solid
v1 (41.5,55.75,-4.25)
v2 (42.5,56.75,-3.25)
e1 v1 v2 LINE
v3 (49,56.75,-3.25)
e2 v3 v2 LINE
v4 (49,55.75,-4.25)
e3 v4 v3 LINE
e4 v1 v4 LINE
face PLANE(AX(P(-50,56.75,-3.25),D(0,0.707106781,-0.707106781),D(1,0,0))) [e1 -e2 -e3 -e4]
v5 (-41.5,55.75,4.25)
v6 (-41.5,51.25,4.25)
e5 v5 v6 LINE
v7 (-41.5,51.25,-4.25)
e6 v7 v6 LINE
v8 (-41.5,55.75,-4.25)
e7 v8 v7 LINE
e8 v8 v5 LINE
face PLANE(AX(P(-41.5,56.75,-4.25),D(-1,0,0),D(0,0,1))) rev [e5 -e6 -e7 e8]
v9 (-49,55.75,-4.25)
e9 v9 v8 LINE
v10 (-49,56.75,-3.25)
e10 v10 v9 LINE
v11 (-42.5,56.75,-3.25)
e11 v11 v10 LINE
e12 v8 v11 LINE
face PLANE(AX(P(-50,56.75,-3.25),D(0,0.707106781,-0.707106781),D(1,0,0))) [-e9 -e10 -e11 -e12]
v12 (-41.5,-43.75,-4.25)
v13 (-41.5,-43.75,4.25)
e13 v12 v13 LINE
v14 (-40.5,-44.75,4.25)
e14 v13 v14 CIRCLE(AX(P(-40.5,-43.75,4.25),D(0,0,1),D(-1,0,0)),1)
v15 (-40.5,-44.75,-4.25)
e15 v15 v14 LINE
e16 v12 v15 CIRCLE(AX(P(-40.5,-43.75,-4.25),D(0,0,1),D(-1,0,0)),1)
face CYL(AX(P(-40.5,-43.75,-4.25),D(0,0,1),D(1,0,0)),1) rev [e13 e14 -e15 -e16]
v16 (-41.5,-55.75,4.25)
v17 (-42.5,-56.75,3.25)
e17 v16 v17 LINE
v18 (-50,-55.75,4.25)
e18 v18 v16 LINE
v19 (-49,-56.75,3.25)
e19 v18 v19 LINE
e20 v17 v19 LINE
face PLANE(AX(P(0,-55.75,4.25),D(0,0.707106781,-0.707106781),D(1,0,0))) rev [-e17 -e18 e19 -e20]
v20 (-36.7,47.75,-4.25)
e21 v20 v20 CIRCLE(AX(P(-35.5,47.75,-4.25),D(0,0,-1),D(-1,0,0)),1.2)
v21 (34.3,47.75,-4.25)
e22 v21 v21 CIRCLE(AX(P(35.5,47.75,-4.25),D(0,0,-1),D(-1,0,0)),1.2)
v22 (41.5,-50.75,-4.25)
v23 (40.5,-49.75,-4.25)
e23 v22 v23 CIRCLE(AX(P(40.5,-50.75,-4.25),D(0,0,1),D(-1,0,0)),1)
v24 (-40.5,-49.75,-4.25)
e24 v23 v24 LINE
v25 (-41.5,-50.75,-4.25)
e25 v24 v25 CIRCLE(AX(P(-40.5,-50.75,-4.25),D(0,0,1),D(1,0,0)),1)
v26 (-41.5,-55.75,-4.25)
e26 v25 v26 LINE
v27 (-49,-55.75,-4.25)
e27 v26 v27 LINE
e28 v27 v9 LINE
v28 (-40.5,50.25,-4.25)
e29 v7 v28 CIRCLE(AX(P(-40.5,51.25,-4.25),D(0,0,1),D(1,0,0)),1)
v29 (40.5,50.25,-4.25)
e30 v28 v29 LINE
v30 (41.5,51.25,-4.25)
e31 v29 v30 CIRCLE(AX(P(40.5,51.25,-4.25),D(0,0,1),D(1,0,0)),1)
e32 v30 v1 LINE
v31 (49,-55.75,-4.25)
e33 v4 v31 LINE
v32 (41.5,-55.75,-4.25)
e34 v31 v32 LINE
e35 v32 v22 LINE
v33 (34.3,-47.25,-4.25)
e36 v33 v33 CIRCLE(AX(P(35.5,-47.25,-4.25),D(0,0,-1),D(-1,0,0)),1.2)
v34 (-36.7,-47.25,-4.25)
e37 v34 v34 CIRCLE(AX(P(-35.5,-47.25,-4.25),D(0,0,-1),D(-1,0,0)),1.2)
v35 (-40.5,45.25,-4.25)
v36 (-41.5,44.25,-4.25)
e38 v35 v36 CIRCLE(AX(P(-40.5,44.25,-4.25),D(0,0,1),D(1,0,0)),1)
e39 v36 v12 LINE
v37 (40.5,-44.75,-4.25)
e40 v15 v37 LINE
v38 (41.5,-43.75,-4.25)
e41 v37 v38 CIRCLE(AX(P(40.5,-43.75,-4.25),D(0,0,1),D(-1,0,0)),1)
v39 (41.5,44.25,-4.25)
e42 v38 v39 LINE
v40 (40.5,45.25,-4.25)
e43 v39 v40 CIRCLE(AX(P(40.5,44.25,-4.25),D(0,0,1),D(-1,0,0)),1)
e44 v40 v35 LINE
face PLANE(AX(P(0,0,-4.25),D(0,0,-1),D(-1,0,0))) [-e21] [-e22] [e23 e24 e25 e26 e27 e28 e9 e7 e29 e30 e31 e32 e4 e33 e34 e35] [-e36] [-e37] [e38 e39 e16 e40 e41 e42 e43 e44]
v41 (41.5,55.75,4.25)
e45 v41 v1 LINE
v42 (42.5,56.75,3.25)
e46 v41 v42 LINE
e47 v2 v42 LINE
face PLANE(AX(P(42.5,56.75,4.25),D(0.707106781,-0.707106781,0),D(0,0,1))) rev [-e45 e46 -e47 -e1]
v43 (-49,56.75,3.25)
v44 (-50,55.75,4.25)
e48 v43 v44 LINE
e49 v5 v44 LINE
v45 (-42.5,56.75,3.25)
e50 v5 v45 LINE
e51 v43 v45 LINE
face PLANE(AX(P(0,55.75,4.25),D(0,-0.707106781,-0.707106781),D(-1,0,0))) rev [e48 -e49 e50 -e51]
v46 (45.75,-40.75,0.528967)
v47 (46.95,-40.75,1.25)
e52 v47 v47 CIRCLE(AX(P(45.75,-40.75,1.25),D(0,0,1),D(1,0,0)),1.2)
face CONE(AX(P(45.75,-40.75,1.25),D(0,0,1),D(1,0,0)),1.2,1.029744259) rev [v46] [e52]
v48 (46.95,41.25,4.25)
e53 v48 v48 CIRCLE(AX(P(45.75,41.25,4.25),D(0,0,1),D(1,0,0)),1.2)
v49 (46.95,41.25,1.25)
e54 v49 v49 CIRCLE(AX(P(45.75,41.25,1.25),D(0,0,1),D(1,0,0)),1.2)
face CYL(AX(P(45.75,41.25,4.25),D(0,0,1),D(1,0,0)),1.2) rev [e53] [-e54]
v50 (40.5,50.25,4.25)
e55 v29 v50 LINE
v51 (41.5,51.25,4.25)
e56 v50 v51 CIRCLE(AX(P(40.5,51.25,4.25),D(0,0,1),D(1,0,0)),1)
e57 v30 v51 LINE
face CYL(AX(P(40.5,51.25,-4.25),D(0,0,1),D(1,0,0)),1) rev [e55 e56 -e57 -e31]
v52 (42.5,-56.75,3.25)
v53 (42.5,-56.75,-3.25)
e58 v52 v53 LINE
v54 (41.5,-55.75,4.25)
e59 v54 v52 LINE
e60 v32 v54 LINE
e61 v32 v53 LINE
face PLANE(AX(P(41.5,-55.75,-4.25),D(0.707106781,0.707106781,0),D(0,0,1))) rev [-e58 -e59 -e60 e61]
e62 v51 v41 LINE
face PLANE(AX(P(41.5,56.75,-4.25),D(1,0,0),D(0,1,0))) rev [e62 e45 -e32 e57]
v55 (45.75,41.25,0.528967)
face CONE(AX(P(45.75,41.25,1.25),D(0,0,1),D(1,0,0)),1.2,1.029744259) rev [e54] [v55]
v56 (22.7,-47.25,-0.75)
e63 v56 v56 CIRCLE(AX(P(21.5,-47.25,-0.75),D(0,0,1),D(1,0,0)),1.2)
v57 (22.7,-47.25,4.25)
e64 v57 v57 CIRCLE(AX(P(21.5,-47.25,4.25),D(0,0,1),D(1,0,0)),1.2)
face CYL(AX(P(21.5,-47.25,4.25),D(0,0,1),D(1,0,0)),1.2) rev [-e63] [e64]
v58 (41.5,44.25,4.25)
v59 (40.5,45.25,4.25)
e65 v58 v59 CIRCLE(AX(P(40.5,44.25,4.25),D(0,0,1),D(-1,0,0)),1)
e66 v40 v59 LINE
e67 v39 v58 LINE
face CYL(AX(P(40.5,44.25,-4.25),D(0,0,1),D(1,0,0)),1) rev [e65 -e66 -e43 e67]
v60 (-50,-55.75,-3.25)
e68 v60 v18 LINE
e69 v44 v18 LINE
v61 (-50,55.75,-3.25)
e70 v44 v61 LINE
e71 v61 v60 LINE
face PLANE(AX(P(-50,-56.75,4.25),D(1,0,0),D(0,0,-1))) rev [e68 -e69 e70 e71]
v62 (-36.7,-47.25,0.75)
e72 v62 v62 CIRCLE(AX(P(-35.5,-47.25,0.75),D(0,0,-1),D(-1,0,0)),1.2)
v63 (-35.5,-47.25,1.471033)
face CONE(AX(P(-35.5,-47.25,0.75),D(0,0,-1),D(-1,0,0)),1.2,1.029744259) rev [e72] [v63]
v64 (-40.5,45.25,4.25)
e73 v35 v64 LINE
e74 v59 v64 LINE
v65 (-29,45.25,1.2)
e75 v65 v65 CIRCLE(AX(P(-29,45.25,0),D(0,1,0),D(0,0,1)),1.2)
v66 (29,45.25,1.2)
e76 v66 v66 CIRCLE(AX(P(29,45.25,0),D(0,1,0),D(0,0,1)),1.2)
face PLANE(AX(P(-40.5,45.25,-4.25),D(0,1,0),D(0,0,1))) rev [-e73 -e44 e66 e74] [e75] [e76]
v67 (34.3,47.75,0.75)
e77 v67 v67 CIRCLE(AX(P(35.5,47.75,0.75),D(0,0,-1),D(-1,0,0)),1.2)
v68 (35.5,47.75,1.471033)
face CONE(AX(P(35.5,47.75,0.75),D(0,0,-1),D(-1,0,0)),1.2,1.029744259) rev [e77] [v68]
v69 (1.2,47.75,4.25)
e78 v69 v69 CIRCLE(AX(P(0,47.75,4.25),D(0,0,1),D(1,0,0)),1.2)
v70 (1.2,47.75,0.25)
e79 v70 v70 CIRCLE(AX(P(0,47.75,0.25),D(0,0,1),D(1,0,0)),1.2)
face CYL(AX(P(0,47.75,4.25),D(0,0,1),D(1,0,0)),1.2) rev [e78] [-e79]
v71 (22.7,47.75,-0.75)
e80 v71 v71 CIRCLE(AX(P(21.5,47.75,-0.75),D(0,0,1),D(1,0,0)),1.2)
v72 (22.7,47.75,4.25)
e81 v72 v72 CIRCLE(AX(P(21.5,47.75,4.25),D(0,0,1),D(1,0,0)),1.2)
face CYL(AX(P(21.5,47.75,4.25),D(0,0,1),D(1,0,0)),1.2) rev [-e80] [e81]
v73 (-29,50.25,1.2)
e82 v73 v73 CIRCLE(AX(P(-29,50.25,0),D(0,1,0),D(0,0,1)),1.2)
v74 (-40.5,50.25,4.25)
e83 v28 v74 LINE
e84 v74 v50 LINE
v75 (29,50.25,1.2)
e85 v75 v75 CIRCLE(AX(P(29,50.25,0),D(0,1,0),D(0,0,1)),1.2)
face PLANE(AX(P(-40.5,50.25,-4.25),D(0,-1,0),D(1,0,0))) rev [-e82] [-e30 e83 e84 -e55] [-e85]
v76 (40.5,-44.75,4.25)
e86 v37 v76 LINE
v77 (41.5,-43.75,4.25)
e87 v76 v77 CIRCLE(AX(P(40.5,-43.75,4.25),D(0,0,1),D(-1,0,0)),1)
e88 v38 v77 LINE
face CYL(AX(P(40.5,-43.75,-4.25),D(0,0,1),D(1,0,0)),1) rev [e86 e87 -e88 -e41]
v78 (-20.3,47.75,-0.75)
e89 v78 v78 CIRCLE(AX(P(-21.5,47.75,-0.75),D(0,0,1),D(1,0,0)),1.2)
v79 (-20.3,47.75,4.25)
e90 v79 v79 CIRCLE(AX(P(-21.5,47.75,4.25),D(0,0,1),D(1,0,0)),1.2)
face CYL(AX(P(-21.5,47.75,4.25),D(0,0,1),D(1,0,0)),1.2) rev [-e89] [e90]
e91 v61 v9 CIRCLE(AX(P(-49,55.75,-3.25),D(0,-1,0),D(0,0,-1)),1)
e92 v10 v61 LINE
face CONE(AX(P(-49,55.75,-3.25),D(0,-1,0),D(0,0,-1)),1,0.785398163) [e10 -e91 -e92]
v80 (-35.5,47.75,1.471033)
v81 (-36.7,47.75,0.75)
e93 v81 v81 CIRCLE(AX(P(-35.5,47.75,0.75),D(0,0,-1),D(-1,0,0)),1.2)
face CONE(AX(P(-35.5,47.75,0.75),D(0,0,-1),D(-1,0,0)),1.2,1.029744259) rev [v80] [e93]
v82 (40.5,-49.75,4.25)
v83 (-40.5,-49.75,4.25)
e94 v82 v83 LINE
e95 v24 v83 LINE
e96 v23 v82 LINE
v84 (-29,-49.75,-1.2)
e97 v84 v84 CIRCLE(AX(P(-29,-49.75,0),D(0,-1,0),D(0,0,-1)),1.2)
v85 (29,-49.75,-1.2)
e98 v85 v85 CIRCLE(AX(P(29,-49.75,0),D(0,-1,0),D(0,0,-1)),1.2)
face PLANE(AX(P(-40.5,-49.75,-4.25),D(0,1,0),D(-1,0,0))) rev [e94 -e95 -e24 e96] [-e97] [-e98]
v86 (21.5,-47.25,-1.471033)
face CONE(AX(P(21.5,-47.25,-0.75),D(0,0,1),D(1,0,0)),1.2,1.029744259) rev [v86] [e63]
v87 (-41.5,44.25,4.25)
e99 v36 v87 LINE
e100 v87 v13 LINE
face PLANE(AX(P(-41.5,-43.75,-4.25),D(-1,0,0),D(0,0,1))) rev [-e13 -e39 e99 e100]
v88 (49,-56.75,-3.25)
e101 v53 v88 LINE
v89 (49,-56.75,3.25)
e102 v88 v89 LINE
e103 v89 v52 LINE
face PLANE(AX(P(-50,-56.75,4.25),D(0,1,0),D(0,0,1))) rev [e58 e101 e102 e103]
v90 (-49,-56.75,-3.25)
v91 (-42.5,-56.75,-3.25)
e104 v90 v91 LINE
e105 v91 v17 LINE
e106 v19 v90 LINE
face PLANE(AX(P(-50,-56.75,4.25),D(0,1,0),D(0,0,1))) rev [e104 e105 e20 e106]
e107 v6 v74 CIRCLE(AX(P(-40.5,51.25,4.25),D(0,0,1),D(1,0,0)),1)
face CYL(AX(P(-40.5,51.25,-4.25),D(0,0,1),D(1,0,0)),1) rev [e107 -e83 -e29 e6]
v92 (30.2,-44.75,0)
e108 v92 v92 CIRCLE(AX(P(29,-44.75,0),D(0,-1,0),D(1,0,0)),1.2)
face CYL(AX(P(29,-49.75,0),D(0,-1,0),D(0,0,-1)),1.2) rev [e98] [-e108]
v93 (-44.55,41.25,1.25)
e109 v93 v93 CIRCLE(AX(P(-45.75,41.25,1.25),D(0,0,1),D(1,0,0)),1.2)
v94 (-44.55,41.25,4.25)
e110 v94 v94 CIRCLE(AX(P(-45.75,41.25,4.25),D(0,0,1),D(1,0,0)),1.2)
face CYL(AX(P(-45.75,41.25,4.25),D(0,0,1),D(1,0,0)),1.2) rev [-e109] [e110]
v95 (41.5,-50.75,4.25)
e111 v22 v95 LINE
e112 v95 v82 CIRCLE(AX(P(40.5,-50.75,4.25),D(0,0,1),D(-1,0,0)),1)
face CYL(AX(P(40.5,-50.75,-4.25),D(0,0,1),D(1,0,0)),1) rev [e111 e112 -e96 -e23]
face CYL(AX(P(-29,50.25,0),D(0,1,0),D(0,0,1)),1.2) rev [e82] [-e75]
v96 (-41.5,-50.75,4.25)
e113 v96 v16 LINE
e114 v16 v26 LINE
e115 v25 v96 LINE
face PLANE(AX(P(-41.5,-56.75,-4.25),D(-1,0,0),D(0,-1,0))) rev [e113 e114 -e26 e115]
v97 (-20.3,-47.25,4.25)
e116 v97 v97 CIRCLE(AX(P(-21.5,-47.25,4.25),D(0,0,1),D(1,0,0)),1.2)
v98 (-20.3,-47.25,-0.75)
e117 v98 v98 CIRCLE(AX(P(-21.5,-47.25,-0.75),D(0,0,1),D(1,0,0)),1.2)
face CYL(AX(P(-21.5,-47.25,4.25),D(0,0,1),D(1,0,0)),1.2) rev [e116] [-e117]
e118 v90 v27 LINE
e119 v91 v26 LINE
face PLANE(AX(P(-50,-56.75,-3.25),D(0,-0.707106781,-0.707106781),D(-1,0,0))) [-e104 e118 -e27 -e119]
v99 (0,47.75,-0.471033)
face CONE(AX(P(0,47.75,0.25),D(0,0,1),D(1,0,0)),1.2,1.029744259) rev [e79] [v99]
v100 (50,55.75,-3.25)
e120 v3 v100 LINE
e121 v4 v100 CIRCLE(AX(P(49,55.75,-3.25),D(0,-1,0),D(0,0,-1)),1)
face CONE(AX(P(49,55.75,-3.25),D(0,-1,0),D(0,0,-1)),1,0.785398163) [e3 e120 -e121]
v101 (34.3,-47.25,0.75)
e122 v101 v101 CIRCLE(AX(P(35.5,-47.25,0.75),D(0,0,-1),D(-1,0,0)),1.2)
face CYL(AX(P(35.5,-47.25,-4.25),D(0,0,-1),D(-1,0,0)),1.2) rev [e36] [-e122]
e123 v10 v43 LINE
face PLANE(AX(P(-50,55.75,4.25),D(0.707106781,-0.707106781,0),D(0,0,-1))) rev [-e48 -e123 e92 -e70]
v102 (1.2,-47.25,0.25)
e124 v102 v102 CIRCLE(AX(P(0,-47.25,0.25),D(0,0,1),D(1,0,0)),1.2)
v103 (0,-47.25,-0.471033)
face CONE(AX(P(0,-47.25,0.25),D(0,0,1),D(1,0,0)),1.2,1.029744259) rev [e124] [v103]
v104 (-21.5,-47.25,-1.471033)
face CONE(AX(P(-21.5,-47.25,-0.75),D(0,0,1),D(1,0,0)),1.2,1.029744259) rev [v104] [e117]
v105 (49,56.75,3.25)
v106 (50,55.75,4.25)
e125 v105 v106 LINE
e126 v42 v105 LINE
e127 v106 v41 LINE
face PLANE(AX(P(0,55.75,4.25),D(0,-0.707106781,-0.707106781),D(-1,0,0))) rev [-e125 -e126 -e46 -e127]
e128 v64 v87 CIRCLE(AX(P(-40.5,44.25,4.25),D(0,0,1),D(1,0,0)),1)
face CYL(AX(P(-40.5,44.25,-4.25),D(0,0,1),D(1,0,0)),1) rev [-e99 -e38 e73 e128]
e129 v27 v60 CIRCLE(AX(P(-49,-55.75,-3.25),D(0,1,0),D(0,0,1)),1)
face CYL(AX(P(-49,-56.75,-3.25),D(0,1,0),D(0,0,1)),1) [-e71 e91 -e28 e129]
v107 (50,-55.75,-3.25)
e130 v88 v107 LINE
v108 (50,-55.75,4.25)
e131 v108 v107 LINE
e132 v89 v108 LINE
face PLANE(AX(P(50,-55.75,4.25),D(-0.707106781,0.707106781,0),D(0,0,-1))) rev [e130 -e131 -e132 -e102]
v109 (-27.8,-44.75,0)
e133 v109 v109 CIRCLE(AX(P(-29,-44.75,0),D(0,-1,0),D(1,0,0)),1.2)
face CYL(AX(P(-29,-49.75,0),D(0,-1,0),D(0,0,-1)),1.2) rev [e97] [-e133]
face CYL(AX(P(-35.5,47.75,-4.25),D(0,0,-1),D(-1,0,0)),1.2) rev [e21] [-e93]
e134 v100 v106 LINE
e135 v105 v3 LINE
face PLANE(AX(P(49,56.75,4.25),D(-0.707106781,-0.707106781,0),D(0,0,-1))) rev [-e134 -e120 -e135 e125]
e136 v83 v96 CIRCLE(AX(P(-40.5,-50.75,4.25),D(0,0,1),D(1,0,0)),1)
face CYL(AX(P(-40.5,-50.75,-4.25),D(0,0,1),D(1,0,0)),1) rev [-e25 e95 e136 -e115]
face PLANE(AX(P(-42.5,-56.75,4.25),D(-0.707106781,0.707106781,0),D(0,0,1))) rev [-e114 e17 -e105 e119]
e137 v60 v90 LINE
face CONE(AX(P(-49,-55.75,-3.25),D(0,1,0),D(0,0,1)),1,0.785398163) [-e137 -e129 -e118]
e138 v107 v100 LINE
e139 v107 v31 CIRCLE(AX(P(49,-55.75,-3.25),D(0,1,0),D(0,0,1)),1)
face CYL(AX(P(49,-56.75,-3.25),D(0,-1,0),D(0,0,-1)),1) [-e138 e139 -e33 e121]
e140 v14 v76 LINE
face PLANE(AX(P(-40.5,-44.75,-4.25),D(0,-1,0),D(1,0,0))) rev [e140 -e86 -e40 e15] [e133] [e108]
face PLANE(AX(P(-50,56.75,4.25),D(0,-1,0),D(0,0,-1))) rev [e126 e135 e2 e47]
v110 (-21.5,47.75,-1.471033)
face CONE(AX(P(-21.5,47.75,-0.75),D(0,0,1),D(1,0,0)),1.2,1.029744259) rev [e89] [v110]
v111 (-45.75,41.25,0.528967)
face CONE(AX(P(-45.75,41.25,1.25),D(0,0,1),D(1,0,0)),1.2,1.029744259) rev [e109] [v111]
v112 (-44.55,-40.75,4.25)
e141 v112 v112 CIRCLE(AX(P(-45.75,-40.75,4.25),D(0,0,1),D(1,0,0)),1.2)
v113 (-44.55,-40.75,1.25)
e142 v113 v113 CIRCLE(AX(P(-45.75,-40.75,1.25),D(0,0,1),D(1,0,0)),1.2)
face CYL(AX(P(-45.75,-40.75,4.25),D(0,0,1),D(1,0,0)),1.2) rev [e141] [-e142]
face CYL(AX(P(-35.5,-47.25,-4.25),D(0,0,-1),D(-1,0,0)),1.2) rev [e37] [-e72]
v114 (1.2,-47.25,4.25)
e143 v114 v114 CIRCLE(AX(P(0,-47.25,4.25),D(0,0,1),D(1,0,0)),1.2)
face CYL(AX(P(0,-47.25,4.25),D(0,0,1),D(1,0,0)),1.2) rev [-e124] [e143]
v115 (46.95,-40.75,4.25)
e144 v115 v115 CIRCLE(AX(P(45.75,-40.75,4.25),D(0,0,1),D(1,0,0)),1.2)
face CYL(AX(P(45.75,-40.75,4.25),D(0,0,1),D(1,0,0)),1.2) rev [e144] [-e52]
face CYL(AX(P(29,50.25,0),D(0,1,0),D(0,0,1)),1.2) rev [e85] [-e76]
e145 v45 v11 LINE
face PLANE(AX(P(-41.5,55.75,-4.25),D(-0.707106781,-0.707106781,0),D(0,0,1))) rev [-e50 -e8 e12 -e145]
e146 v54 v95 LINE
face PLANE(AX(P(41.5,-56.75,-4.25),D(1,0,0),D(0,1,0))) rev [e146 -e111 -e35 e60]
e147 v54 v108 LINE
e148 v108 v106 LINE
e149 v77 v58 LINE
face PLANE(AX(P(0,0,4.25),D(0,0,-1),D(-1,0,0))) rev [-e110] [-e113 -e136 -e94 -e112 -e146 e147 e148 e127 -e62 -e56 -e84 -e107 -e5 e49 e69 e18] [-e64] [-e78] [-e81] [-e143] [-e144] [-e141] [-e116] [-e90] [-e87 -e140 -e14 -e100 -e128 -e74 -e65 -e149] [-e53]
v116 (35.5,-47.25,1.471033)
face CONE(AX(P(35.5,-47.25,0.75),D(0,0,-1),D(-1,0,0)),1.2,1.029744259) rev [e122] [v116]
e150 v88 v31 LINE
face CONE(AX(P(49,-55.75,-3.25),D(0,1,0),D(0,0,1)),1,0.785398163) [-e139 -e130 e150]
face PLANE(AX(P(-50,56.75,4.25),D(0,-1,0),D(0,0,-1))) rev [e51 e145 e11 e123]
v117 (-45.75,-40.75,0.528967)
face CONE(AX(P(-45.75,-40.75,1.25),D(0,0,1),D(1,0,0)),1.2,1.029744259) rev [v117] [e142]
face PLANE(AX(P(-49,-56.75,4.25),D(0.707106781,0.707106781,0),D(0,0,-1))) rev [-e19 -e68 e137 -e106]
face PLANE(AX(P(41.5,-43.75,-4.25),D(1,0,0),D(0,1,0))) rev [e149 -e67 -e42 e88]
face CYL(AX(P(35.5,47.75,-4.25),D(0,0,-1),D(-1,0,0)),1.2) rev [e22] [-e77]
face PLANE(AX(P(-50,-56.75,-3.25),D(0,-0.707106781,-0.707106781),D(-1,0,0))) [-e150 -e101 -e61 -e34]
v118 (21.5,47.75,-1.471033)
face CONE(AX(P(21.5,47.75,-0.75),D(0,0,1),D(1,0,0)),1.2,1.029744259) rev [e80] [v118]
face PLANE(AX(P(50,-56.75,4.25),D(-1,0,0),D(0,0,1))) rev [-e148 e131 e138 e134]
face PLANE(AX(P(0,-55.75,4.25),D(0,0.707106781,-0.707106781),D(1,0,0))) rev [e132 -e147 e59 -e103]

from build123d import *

# Parameters (mm, degrees)
SKETCH1_W           = 100
SKETCH1_H           = 113.5
BOSS_EXTRUDE1_DEPTH = 4.25
CUT_EXTRUDE1_DEPTH  = 77.110528181
M2_HOLE1_C_D        = 2.4
M2_HOLE1_C_DEPTH    = 3
M2_HOLE1_C_TIP      = 0.721032743
M2_HOLE2_D_D        = 2.4
M2_HOLE2_D_DEPTH    = 5
M2_HOLE2_D_TIP      = 0.721032743
M2_HOLE3_E_D        = 2.4
M2_HOLE3_E_DEPTH    = 4
M2_HOLE3_E_TIP      = 0.721032743
M2_HOLE4_F_D        = 2.4
M2_HOLE4_F_DEPTH    = 10
M2_HOLE4_F_TIP      = 0.721032743
M2_HOLE5_G_D        = 2.4
M2_HOLE5_G_DEPTH    = 10
M2_HOLE5_G_TIP      = 0.721032743
M2_HOLE6_H_D        = 2.4
M2_HOLE6_H_DEPTH    = 5
M2_HOLE6_H_TIP      = 0.721032743
FILLET1_R           = 1
CHAMFER1_SIZE       = 1


with BuildPart() as part:
    # Sketch1 → Boss-Extrude1 (new, symmetric)
    with BuildSketch(Plane.XY):
        Rectangle(SKETCH1_W, SKETCH1_H)
    extrude(amount=BOSS_EXTRUDE1_DEPTH, both=True)

    # Sketch4 → Cut-Extrude1 (cut, through all)
    with BuildSketch(Plane.XY.offset(4.25)):
        with BuildLine():
            Line((-40.5, -44.75), (40.5, -44.75))
            ThreePointArc((40.5, -44.75), (41.207106781, -44.457106781), (41.5, -43.75))
            Line((41.5, -43.75), (41.5, 44.25))
            ThreePointArc((41.5, 44.25), (41.207106781, 44.957106781), (40.5, 45.25))
            Line((40.5, 45.25), (-40.5, 45.25))
            ThreePointArc((-40.5, 45.25), (-41.207106781, 44.957106781), (-41.5, 44.25))
            Line((-41.5, 44.25), (-41.5, -43.75))
            ThreePointArc((-41.5, -43.75), (-41.207106781, -44.457106781), (-40.5, -44.75))
        make_face()
        with BuildLine():
            Line((-41.5, 56.75), (41.5, 56.75))
            Line((41.5, 56.75), (41.5, 51.25))
            ThreePointArc((41.5, 51.25), (41.207106781, 50.542893219), (40.5, 50.25))
            Line((40.5, 50.25), (-40.5, 50.25))
            ThreePointArc((-40.5, 50.25), (-41.207106781, 50.542893219), (-41.5, 51.25))
            Line((-41.5, 51.25), (-41.5, 56.75))
        make_face()
        with BuildLine():
            Line((-41.5, -56.75), (41.5, -56.75))
            Line((41.5, -56.75), (41.5, -50.75))
            ThreePointArc((41.5, -50.75), (41.207106781, -50.042893219), (40.5, -49.75))
            Line((40.5, -49.75), (-40.5, -49.75))
            ThreePointArc((-40.5, -49.75), (-41.207106781, -50.042893219), (-41.5, -50.75))
            Line((-41.5, -50.75), (-41.5, -56.75))
        make_face()
    extrude(amount=-CUT_EXTRUDE1_DEPTH, mode=Mode.SUBTRACT)

    # M2 Hole1-C
    with Locations(Plane.XY.offset(4.25)):
        with Locations((-45.75, -40.75), (45.75, -40.75), (-45.75, 41.25), (45.75, 41.25)):
            Hole(M2_HOLE1_C_D / 2, depth=M2_HOLE1_C_DEPTH)
            with Locations((0, 0, -(M2_HOLE1_C_DEPTH + M2_HOLE1_C_TIP / 2))):  # 118° drill point
                Cone(0, M2_HOLE1_C_D / 2, M2_HOLE1_C_TIP, mode=Mode.SUBTRACT)

    # M2 Hole2-D
    with Locations(Plane.XY.offset(4.25)):
        with Locations((-21.5, 47.75), (21.5, 47.75), (-21.5, -47.25), (21.5, -47.25)):
            Hole(M2_HOLE2_D_D / 2, depth=M2_HOLE2_D_DEPTH)
            with Locations((0, 0, -(M2_HOLE2_D_DEPTH + M2_HOLE2_D_TIP / 2))):  # 118° drill point
                Cone(0, M2_HOLE2_D_D / 2, M2_HOLE2_D_TIP, mode=Mode.SUBTRACT)

    # M2 Hole3-E
    with Locations(Plane.XY.offset(4.25)):
        with Locations((0, 47.75), (0, -47.25)):
            Hole(M2_HOLE3_E_D / 2, depth=M2_HOLE3_E_DEPTH)
            with Locations((0, 0, -(M2_HOLE3_E_DEPTH + M2_HOLE3_E_TIP / 2))):  # 118° drill point
                Cone(0, M2_HOLE3_E_D / 2, M2_HOLE3_E_TIP, mode=Mode.SUBTRACT)

    # M2 Hole4-F
    with Locations(Plane(origin=(0, 50.25, 0), x_dir=(1, 0, 0), z_dir=(0, 1, 0))):
        with Locations((-29, 0), (29, 0)):
            Hole(M2_HOLE4_F_D / 2, depth=M2_HOLE4_F_DEPTH)
            with Locations((0, 0, -(M2_HOLE4_F_DEPTH + M2_HOLE4_F_TIP / 2))):  # 118° drill point
                Cone(0, M2_HOLE4_F_D / 2, M2_HOLE4_F_TIP, mode=Mode.SUBTRACT)

    # M2 Hole5-G
    with Locations(Plane(origin=(0, -49.75, 0), x_dir=(-1, 0, 0), z_dir=(0, -1, 0))):
        with Locations((29, 0), (-29, 0)):
            Hole(M2_HOLE5_G_D / 2, depth=M2_HOLE5_G_DEPTH)
            with Locations((0, 0, -(M2_HOLE5_G_DEPTH + M2_HOLE5_G_TIP / 2))):  # 118° drill point
                Cone(0, M2_HOLE5_G_D / 2, M2_HOLE5_G_TIP, mode=Mode.SUBTRACT)

    # M2 Hole6-H
    with Locations(Plane(origin=(0, 0, -4.25), x_dir=(-1, 0, 0), z_dir=(0, 0, -1))):
        with Locations((-35.5, 47.75), (35.5, 47.75), (-35.5, -47.25), (35.5, -47.25)):
            Hole(M2_HOLE6_H_D / 2, depth=M2_HOLE6_H_DEPTH)
            with Locations((0, 0, -(M2_HOLE6_H_DEPTH + M2_HOLE6_H_TIP / 2))):  # 118° drill point
                Cone(0, M2_HOLE6_H_D / 2, M2_HOLE6_H_TIP, mode=Mode.SUBTRACT)

    # Fillet1
    fillet1_edges = [part.edges().sort_by_distance(p)[0] for p in [
        (-50, 0, -4.25),
        (50, 0, -4.25),
    ]]
    fillet(fillet1_edges, radius=FILLET1_R)

    # Chamfer1
    chamfer1_edges = [part.edges().sort_by_distance(p)[0] for p in [
        (-45.75, -56.75, 4.25),
        (45.25, -56.75, -4.25),
        (45.75, -56.75, 4.25),
        (-45.25, -56.75, -4.25),
        (-49.707106781, -56.75, -3.957106781),
        (45.25, 56.75, -4.25),
        (-49.707106781, 56.75, -3.957106781),
        (49.707106781, 56.75, -3.957106781),
        (49.707106781, -56.75, -3.957106781),
        (41.5, -56.75, 0),
        (-41.5, -56.75, 0),
        (-45.25, 56.75, -4.25),
        (-45.75, 56.75, 4.25),
        (-41.5, 56.75, 0),
        (41.5, 56.75, 0),
        (45.75, 56.75, 4.25),
        (50, -56.75, 0.5),
        (-50, -56.75, 0.5),
        (-50, 56.75, 0.5),
        (50, 56.75, 0.5),
    ]]
    chamfer(chamfer1_edges, length=CHAMFER1_SIZE - 0.0001)  # a hair under: the kernel refuses the full size


solid = part.part
